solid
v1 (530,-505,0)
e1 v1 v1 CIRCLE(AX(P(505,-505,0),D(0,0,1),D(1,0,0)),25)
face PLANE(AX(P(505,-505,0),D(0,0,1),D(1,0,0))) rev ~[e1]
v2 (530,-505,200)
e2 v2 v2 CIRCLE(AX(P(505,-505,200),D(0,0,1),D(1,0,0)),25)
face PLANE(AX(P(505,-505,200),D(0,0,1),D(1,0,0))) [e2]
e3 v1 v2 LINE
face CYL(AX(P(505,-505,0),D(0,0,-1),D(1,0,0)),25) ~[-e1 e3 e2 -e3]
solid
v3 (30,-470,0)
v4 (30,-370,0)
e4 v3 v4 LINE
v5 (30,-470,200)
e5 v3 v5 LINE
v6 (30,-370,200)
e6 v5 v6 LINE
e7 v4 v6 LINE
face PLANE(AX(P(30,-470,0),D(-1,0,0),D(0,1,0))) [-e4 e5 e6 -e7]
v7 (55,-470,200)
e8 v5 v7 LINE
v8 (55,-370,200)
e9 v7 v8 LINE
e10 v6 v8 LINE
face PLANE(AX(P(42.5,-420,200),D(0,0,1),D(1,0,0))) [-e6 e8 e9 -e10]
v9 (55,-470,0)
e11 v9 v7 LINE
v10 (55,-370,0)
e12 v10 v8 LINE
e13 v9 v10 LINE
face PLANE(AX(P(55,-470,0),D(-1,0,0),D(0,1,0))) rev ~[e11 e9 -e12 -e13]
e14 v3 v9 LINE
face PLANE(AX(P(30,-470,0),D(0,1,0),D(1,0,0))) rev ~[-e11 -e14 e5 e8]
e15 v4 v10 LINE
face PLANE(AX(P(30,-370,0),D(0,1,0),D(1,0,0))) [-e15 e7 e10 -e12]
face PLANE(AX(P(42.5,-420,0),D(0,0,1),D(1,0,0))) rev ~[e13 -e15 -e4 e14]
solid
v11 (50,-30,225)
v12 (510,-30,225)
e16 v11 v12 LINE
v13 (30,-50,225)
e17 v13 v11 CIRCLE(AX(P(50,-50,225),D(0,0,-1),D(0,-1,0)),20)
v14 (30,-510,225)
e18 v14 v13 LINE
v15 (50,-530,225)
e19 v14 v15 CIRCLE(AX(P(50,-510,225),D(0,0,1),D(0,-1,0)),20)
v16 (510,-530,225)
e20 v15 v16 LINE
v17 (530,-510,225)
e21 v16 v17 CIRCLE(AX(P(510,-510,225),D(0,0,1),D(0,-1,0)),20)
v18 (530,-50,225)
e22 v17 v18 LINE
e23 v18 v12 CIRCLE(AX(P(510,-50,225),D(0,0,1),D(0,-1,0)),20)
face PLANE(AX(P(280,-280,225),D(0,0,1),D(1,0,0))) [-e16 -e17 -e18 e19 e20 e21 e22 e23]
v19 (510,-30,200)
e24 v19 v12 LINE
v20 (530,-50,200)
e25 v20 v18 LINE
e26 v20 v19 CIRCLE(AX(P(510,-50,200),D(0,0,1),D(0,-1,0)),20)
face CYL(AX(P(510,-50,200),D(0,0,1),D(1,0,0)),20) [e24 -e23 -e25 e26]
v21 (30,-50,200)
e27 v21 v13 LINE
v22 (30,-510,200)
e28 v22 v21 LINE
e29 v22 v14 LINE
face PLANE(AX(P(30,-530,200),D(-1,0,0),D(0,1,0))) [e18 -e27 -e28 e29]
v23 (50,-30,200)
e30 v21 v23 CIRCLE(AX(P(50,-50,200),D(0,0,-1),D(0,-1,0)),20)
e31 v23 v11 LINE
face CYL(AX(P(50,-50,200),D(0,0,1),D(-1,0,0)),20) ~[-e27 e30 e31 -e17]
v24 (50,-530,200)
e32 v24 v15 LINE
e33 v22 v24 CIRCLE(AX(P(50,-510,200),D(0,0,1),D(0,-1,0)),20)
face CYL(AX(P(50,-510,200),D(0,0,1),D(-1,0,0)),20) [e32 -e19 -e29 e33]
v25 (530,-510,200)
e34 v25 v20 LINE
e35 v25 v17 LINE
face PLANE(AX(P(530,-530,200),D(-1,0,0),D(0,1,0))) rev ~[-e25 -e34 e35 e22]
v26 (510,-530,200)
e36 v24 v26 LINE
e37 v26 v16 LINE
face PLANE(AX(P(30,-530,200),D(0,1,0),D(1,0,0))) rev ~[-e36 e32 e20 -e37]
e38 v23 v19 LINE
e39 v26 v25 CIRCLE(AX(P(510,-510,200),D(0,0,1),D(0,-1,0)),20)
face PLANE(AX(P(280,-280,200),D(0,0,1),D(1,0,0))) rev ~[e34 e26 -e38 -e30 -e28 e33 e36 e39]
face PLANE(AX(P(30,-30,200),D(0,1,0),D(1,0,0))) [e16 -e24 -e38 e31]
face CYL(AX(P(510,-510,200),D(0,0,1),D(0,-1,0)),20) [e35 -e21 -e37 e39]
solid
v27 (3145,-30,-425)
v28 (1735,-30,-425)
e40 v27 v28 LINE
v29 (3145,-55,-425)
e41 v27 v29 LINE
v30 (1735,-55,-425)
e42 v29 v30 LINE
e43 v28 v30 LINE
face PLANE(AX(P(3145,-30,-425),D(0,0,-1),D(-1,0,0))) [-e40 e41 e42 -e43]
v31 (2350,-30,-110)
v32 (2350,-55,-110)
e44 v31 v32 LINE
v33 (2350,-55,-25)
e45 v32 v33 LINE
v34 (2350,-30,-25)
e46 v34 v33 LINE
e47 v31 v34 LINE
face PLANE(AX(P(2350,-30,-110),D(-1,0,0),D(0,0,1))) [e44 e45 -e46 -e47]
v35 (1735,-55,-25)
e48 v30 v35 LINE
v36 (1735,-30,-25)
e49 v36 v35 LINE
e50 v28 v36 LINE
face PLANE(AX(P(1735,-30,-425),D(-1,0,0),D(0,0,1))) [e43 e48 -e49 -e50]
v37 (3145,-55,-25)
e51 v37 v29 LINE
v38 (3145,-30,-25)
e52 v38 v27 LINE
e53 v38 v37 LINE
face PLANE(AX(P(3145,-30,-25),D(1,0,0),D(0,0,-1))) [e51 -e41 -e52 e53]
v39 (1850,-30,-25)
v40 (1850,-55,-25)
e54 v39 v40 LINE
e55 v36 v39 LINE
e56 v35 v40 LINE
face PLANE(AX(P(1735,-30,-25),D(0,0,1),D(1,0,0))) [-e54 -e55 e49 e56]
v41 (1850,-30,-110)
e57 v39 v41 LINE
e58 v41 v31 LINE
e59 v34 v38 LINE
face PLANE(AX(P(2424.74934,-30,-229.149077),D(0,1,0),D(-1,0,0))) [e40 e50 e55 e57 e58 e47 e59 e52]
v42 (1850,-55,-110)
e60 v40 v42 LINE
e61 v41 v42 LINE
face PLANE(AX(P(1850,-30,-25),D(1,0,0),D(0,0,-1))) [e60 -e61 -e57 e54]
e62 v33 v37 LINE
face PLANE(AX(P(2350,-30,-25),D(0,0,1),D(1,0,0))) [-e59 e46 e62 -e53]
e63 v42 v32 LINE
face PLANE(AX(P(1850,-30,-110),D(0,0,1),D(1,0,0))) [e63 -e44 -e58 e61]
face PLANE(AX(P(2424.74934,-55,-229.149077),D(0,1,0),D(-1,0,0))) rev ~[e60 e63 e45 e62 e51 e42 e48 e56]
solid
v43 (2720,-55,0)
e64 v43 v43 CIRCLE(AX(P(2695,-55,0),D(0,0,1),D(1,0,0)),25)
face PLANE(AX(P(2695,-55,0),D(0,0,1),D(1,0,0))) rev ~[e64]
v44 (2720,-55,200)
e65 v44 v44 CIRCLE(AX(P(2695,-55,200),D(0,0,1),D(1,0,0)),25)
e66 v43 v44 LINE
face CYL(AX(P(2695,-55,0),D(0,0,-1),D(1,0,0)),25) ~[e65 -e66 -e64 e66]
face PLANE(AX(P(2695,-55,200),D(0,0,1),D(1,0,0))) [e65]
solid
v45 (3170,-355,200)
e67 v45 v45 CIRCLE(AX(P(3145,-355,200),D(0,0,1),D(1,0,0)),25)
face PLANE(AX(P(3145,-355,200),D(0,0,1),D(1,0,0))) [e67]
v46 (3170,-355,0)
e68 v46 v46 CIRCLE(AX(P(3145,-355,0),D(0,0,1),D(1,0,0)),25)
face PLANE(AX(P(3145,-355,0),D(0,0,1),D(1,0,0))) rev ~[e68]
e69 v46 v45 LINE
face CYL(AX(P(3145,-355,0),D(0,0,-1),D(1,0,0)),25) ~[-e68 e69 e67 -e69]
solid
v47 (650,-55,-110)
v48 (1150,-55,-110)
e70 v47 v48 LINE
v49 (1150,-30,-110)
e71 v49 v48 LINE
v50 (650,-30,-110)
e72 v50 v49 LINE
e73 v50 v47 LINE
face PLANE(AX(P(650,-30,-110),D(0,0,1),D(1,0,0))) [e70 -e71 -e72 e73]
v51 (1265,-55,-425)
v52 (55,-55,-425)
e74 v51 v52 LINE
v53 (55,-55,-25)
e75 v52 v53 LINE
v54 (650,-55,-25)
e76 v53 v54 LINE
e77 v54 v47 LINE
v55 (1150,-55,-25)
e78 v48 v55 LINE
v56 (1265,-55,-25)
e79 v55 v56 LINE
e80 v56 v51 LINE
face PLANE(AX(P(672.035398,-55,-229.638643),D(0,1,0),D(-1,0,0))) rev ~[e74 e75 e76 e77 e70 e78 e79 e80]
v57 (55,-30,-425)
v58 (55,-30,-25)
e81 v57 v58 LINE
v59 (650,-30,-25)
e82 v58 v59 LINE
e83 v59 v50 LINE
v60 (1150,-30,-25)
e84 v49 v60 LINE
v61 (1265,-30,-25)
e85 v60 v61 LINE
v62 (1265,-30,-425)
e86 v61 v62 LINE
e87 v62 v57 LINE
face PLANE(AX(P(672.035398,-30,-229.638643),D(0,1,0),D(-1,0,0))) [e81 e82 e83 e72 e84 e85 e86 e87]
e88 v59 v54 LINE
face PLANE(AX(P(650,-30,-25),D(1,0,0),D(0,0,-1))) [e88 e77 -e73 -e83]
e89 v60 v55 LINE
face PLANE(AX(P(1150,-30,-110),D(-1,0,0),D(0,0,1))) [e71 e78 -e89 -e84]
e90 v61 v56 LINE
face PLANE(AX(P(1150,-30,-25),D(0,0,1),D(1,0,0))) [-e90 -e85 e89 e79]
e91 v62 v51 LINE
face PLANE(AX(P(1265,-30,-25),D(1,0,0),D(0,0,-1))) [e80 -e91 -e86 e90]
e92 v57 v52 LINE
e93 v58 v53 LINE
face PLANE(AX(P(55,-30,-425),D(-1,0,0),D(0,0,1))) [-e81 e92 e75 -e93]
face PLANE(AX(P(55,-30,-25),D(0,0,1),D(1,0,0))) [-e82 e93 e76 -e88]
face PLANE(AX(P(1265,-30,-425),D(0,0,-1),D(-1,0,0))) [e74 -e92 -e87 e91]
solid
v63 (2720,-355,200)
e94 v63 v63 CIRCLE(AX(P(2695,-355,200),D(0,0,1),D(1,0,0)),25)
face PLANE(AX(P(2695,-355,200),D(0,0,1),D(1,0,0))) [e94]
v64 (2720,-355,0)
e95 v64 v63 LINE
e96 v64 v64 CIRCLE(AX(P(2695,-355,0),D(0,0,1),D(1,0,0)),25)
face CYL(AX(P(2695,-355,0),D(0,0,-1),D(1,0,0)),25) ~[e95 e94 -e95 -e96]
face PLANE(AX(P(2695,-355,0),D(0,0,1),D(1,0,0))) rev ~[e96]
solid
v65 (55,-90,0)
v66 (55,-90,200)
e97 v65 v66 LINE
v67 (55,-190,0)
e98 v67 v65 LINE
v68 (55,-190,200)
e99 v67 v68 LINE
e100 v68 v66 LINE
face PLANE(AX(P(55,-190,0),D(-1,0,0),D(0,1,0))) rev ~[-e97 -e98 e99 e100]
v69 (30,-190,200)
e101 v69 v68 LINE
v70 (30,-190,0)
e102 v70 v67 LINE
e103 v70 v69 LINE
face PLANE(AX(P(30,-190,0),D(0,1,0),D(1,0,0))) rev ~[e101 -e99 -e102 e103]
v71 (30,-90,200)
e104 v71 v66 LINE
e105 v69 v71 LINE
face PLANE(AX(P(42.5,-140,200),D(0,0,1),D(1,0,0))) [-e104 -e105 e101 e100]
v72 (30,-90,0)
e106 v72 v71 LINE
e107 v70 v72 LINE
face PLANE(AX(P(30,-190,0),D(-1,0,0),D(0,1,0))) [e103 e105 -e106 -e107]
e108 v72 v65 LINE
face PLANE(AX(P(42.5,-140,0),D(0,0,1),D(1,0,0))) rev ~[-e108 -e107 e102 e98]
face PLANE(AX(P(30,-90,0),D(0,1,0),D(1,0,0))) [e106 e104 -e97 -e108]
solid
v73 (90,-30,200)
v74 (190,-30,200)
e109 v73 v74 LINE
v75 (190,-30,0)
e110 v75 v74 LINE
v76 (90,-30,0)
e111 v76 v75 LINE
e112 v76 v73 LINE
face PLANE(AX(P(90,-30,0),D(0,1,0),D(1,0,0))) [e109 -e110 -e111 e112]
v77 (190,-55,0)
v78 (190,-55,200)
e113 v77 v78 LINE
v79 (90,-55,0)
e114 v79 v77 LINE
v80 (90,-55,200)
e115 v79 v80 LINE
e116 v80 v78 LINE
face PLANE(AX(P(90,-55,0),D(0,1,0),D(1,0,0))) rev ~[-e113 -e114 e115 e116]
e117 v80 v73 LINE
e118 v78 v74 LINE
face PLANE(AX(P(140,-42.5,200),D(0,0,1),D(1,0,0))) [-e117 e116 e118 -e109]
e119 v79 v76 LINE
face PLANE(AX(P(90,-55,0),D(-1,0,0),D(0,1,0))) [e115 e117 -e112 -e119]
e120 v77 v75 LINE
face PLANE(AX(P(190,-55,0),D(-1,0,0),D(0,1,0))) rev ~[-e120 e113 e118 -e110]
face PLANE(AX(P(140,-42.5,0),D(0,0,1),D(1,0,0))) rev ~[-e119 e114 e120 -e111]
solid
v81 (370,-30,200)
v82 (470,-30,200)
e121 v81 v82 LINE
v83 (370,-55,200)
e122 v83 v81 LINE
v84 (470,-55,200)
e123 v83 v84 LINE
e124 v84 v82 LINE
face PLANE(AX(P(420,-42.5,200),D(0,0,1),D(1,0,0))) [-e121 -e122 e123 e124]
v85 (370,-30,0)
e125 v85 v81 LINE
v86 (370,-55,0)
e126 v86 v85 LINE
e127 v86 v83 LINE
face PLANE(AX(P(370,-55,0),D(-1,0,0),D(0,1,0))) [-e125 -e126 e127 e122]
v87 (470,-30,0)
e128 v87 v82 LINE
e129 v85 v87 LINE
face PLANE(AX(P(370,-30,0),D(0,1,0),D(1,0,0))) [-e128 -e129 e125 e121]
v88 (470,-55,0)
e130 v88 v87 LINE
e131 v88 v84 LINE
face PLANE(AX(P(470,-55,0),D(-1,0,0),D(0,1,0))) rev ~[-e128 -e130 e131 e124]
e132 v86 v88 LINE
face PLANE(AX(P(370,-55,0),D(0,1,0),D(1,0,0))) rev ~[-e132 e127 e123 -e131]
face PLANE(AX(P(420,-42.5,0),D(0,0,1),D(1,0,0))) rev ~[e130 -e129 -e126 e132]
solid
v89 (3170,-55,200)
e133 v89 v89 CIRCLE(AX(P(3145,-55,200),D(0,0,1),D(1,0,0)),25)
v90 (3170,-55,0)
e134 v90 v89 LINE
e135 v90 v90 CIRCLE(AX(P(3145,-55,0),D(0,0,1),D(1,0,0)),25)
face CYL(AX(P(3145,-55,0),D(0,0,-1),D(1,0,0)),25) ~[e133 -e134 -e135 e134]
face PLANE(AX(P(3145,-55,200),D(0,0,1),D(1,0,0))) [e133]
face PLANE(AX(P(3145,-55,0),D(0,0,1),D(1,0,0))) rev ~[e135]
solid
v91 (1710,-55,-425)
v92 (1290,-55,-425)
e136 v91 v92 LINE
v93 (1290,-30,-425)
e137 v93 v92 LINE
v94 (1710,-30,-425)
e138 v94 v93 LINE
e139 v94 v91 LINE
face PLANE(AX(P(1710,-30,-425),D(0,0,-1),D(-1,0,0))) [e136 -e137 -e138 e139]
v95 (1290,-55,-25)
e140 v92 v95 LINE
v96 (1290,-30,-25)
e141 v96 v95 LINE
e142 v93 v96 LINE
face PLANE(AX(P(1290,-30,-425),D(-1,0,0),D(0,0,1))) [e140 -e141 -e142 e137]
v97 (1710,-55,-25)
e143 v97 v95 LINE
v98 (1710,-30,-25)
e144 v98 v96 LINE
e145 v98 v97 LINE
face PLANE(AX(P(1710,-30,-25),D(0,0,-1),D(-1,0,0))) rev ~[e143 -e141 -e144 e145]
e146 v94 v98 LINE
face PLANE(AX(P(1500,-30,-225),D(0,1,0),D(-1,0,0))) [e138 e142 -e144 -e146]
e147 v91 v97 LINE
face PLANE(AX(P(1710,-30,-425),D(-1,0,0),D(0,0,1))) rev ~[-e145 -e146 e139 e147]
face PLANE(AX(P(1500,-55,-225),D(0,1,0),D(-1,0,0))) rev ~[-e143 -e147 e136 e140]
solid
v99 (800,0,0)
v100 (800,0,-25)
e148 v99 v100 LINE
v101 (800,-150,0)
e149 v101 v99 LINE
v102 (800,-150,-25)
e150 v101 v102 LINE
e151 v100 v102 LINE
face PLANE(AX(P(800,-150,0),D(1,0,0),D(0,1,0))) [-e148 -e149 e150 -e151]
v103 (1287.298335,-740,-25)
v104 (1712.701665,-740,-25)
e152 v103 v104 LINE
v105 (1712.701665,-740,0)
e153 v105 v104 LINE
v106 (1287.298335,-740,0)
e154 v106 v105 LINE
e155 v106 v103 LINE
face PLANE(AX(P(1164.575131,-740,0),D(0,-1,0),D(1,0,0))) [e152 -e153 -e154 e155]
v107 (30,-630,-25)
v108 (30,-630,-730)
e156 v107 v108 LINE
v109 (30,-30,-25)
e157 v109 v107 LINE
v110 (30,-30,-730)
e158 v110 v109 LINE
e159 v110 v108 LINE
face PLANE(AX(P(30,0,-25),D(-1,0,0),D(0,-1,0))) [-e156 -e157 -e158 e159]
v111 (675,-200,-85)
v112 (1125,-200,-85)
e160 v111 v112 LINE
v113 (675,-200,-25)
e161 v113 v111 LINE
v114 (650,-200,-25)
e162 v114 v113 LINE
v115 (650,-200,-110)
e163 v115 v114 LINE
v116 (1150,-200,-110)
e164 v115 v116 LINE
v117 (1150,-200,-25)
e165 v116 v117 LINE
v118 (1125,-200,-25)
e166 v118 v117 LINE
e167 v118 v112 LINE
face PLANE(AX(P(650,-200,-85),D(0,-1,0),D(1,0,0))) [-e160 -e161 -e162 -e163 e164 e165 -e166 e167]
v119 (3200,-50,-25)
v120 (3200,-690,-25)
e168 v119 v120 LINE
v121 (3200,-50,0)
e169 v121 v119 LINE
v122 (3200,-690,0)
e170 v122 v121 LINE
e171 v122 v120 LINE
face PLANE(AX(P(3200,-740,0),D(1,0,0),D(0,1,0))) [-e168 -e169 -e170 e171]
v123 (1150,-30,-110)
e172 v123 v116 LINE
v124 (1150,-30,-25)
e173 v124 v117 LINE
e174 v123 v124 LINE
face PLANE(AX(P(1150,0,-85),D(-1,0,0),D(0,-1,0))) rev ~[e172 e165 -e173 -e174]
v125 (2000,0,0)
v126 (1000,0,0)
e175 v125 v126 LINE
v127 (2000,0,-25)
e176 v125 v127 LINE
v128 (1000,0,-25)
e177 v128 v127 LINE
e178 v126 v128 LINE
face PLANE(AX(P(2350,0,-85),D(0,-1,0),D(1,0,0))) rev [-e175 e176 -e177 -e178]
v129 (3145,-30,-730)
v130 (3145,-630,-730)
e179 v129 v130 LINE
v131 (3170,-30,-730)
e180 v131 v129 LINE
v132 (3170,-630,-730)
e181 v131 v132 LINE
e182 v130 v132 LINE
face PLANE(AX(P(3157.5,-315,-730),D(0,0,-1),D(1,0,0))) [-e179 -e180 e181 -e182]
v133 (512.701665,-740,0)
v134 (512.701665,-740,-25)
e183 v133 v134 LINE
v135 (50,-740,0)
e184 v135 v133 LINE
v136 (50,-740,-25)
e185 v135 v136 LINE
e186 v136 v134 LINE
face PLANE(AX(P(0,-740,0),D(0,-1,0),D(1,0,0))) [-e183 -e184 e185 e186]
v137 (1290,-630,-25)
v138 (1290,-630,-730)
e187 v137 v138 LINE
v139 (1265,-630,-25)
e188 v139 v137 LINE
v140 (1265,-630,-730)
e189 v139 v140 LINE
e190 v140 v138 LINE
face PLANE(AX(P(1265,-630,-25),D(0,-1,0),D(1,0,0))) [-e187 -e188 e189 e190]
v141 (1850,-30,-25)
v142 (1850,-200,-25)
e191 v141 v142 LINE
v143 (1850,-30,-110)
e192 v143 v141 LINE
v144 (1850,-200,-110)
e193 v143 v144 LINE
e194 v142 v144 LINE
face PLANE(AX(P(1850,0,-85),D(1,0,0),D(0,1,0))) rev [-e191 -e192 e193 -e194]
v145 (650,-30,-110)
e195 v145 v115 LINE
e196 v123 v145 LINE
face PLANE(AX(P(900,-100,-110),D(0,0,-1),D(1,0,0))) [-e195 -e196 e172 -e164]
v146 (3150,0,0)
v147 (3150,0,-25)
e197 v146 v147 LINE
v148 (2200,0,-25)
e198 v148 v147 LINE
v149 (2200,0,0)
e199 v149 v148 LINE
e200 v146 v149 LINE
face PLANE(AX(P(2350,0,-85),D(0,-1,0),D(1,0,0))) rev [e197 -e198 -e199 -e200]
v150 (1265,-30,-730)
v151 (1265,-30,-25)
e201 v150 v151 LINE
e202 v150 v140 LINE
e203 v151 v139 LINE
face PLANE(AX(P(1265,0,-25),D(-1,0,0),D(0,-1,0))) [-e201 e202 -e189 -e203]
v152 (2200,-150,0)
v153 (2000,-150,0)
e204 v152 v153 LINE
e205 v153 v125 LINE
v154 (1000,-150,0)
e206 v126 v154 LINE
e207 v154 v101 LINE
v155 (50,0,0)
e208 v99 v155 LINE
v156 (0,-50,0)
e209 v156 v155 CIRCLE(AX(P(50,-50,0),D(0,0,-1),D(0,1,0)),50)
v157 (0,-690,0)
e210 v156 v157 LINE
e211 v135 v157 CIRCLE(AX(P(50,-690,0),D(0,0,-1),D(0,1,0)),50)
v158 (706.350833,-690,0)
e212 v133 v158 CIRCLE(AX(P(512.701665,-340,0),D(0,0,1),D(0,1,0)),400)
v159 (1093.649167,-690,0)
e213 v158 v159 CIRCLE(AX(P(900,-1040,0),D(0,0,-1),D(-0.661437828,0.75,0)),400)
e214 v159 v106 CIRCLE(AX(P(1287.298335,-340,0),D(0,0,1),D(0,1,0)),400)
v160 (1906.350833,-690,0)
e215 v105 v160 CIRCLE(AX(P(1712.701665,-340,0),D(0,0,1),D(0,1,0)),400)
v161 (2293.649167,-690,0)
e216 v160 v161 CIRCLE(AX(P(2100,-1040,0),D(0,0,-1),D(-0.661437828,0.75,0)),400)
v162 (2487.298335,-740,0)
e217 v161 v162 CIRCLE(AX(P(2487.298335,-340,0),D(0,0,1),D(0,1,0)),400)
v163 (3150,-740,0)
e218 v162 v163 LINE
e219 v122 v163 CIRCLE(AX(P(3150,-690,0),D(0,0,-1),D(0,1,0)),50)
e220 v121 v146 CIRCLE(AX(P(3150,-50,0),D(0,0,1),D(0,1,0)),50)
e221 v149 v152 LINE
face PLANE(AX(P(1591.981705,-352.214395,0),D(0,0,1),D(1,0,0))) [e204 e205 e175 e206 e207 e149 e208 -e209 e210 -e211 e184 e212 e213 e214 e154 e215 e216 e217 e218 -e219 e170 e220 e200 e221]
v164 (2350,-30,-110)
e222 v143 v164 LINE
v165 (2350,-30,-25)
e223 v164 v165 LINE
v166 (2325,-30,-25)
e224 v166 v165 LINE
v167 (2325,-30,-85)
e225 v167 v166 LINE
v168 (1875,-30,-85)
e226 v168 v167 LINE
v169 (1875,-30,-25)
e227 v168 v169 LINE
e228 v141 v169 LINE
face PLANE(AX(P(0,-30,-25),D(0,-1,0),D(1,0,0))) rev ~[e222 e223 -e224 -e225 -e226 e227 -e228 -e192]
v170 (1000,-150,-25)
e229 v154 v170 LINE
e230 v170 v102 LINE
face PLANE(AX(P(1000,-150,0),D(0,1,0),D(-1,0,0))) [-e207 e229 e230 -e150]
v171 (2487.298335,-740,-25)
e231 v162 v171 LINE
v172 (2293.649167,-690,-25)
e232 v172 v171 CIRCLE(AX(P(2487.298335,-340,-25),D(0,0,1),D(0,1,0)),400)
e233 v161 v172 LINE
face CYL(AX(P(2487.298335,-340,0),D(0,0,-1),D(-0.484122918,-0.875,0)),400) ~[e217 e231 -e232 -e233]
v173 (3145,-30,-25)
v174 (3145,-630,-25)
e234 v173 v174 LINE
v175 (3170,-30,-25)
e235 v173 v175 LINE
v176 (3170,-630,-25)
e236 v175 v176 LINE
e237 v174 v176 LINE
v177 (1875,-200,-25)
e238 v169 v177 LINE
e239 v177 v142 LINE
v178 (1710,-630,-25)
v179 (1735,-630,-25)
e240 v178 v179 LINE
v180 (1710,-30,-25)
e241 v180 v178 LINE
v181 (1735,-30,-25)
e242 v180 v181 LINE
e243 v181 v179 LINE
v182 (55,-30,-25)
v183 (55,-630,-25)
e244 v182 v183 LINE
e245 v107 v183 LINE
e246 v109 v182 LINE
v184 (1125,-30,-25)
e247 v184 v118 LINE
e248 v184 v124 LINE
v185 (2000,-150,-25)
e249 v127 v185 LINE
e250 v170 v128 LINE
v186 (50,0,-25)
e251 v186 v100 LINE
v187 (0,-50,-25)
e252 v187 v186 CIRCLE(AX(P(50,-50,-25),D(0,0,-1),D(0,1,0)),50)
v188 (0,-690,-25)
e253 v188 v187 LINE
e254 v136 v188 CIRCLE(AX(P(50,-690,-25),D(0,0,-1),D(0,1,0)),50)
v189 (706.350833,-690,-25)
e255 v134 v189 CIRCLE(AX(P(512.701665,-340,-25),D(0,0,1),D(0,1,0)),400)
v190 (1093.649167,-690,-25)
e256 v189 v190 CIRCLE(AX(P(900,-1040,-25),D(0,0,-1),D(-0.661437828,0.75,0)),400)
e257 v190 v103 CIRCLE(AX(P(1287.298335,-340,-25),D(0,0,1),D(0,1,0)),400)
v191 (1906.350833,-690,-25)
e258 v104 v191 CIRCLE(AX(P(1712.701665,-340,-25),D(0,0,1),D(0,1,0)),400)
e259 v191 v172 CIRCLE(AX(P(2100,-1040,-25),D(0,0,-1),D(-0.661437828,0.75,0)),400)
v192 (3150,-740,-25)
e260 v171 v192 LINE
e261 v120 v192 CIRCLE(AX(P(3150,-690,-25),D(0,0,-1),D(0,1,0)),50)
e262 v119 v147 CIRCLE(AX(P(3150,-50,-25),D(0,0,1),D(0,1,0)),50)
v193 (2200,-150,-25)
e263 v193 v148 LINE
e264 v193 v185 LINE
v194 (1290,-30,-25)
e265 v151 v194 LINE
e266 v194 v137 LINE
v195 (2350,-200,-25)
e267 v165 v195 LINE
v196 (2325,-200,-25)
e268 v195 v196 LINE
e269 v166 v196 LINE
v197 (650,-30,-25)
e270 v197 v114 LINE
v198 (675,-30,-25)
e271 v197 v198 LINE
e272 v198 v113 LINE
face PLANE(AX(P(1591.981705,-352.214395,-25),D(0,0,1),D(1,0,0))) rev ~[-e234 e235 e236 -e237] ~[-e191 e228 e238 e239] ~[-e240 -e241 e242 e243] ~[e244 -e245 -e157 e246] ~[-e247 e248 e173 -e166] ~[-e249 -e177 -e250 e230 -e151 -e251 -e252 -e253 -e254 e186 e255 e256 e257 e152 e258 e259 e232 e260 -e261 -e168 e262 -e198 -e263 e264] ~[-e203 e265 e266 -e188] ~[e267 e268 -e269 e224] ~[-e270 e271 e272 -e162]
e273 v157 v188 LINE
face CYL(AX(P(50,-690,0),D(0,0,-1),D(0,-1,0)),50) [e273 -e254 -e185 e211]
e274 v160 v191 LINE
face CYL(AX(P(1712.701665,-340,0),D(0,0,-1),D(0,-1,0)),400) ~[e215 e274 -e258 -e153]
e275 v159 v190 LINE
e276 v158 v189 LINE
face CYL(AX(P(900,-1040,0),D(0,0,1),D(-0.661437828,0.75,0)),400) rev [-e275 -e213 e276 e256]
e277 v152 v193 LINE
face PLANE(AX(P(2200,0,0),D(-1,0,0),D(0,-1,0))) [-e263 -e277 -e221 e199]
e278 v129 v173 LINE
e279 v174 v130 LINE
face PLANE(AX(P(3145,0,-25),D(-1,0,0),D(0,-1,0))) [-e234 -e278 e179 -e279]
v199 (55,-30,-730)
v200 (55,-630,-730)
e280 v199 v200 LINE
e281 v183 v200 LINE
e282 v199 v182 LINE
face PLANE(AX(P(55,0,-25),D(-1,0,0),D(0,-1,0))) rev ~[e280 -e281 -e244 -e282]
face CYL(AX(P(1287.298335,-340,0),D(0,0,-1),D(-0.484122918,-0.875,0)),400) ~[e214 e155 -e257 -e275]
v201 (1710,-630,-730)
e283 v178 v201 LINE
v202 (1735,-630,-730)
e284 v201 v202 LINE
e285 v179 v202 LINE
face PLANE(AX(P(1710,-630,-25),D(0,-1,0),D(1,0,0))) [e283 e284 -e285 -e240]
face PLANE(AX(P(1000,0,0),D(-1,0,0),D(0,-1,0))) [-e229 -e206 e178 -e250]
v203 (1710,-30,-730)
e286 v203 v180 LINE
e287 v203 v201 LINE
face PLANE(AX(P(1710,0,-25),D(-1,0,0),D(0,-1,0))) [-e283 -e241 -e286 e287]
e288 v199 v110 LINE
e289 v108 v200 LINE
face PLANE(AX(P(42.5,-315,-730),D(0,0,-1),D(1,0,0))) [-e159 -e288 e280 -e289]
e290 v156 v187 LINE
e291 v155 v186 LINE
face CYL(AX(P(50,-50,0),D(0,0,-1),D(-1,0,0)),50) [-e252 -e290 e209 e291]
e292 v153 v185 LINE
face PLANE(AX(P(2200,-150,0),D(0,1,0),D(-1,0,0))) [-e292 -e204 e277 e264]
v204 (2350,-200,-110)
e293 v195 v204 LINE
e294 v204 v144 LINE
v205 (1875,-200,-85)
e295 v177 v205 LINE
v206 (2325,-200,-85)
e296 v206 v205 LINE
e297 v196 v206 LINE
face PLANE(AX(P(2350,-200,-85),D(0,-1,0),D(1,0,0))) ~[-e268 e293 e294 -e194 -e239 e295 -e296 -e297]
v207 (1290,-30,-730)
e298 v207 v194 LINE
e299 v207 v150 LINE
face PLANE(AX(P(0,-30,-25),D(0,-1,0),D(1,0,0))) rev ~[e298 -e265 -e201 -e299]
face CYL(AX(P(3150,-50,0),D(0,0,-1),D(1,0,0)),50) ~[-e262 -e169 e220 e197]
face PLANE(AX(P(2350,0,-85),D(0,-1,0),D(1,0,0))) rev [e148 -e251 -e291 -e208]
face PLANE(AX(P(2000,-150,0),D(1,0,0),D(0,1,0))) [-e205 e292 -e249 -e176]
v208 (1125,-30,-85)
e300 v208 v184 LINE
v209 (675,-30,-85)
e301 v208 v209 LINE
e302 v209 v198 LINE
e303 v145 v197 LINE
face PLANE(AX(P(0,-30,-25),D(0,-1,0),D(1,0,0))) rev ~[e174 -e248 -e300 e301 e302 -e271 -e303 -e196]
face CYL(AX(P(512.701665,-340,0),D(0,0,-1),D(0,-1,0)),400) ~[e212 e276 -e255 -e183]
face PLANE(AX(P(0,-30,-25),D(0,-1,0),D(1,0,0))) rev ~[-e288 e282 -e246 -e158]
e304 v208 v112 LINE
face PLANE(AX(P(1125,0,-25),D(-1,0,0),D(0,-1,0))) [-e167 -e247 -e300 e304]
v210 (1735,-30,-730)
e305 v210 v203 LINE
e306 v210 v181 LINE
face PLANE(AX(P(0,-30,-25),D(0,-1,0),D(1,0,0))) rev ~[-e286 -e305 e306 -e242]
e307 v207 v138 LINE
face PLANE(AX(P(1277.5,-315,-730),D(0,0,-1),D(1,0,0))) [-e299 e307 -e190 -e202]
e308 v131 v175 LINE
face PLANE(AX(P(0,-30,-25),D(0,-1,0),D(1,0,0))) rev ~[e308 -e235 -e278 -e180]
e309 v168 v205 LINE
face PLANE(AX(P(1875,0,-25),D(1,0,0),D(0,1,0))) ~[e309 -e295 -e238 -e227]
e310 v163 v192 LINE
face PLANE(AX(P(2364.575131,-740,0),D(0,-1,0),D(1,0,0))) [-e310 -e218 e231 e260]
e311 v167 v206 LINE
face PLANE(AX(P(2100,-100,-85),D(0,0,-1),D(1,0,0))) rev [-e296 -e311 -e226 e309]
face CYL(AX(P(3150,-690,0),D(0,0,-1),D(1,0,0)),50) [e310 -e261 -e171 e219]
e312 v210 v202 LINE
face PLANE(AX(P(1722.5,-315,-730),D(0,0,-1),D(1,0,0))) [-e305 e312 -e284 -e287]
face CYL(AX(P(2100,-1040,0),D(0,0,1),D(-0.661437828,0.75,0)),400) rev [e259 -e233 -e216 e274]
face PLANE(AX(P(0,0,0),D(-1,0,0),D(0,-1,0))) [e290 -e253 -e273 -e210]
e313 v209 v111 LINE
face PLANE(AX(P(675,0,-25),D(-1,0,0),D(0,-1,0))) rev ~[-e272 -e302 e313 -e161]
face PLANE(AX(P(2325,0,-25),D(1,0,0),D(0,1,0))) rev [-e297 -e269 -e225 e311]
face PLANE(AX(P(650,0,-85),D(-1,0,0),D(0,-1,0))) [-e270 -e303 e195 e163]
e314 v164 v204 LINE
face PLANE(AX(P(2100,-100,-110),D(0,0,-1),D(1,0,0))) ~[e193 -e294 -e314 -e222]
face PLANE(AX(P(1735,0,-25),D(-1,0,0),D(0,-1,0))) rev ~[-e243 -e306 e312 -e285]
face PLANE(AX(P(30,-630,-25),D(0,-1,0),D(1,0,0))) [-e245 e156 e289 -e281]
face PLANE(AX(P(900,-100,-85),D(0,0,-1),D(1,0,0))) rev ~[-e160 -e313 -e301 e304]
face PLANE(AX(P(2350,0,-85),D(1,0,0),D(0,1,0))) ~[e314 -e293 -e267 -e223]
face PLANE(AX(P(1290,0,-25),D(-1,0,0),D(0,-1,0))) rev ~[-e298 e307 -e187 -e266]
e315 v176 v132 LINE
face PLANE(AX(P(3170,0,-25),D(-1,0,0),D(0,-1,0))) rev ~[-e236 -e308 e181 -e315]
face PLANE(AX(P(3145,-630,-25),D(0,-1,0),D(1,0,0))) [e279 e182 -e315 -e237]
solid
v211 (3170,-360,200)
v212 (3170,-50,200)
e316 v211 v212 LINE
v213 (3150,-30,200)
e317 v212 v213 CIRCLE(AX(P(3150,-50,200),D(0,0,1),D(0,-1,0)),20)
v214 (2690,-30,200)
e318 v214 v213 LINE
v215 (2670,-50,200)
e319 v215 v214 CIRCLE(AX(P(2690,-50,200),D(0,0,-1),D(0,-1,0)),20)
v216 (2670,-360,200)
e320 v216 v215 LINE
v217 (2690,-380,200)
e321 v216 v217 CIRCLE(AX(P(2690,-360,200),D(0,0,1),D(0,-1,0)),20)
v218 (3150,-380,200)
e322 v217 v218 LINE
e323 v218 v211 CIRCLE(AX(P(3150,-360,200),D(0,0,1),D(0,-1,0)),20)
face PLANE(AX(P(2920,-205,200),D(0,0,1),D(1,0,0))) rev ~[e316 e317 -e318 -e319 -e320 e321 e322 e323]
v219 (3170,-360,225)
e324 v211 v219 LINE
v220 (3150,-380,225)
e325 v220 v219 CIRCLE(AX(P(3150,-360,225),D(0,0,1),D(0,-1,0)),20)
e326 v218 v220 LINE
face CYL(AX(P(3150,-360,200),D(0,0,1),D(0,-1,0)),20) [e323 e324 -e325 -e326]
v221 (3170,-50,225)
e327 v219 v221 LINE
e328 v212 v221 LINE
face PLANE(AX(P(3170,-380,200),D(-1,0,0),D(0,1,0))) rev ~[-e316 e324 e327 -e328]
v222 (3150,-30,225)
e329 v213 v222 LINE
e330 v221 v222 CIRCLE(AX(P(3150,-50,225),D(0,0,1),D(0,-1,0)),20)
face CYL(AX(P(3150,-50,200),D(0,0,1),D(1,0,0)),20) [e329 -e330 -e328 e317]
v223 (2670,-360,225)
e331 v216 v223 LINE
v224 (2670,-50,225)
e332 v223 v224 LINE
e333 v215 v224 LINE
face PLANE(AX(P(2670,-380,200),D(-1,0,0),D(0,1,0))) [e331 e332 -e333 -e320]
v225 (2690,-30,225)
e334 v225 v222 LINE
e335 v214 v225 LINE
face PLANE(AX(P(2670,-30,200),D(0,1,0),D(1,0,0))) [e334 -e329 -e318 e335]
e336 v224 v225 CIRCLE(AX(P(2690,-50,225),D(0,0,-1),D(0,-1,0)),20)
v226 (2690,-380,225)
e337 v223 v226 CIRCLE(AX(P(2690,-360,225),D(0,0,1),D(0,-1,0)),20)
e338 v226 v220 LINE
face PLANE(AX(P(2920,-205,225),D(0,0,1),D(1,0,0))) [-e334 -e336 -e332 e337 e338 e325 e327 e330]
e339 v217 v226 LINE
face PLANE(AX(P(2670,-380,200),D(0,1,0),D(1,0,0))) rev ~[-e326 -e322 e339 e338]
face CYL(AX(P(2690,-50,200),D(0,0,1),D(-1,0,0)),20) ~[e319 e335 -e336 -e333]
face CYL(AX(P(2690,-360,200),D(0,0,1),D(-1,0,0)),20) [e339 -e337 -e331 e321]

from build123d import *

# Parameters (mm, degrees)
F2_DEPTH  = 25
F3_R      = 400
F6_W      = 25
F6_H      = 630
F7_DEPTH  = 705
F8_W      = 25
F8_H      = 200
F9_DEPTH  = 60
F10_W     = 500
F10_H     = 200
F11_DEPTH = 25
F12_W     = 3200
F12_H     = 30
F13_DEPTH = 705.001
F14_R     = 50
F15_W     = 100
F15_H     = 25
F16_DEPTH = 200
F15_W_2   = 25
F15_H_2   = 100
F15_R     = 25
F17_W     = 500
F17_H     = 500
F18_DEPTH = 25
F19_R     = 20
F21_DEPTH = 25
F20_W     = 420
F20_H     = 400
F22_R     = 25
F23_DEPTH = 200
F24_W     = 500
F24_H     = 350
F25_DEPTH = 25
F26_R     = 20


# Not quite as in the source:
# - a pattern or mirror of a feature is missing from the dataset's text; its kind, count and spacing are read off the source's solid


with BuildPart() as f2:
    # F1 (on Top) → F2 (new body)
    with BuildSketch(Plane.XY):
        with BuildLine():
            Line((800, 0), (0, 0))
            Line((0, 0), (0, -740))
            Line((0, -740), (635.4248688935, -740))
            ThreePointArc((635.4248688935, -740), (900, -640), (1164.5751311065, -740))
            Line((1164.5751311065, -740), (1835.4248688935, -740))
            ThreePointArc((1835.4248688935, -740), (2100, -640), (2364.5751311065, -740))
            Line((2364.5751311065, -740), (3200, -740))
            Line((3200, -740), (3200, 0))
            Line((3200, 0), (2200, 0))
            Line((2200, 0), (2200, -150))
            Line((2200, -150), (2000, -150))
            Line((2000, -150), (2000, 0))
            Line((2000, 0), (1000, 0))
            Line((1000, 0), (1000, -150))
            Line((1000, -150), (800, -150))
            Line((800, -150), (800, 0))
        make_face()
    extrude(amount=-F2_DEPTH)

    # F3
    f3_edges = [f2.edges().sort_by_distance(p)[0] for p in [
        (635.424869, -740, -12.5),
        (1164.575131, -740, -12.5),
        (1835.424869, -740, -12.5),
        (2364.575131, -740, -12.5),
    ]]
    fillet(f3_edges, radius=F3_R)

    # F6 (on face) → F7 (join)
    with BuildSketch(Plane(origin=(0, 0, -25), x_dir=(1, 0, 0), z_dir=(0, 0, -1))):
        with Locations((1277.5, 315)):
            Rectangle(F6_W, F6_H)
        with Locations((1722.5, 315)):
            Rectangle(F6_W, F6_H)
        with Locations((42.5, 315)):
            Rectangle(F6_W, F6_H)
        with Locations((3157.5, 315)):
            Rectangle(F6_W, F6_H)
    extrude(amount=F7_DEPTH)

    # F8 (on face) → F9 (join)
    with BuildSketch(Plane(origin=(0, 0, -25), x_dir=(1, 0, 0), z_dir=(0, 0, -1))):
        with Locations((662.5, 100)):
            Rectangle(F8_W, F8_H)
        with Locations((1137.5, 100)):
            Rectangle(F8_W, F8_H)
    f9 = extrude(amount=F9_DEPTH)

    # F9_copies: F9 across plane
    add(f9.mirror(Plane(origin=(1500, 0, 0), x_dir=(0, 0, 1), z_dir=(1, 0, 0))))

    # F10 (on face) → F11 (join)
    with BuildSketch(Plane(origin=(0, 0, -85), x_dir=(1, 0, 0), z_dir=(0, 0, -1))):
        with Locations((900, 100)):
            Rectangle(F10_W, F10_H)
    f11 = extrude(amount=F11_DEPTH)

    # F11_copies: F11 across plane
    add(f11.mirror(Plane(origin=(1500, 0, 0), x_dir=(0, 0, 1), z_dir=(1, 0, 0))))

    # F12 (on face) → F13 (cut, through all)
    with BuildSketch(Plane(origin=(0, 0, -25), x_dir=(1, 0, 0), z_dir=(0, 0, -1))):
        with Locations((1600, 15)):
            Rectangle(F12_W, F12_H)
    extrude(amount=F13_DEPTH, mode=Mode.SUBTRACT)

    # F14
    f14_edges = [f2.edges().sort_by_distance(p)[0] for p in [
        (3200, -740, -12.5),
        (3200, 0, -12.5),
        (0, 0, -12.5),
        (0, -740, -12.5),
    ]]
    fillet(f14_edges, radius=F14_R)


with BuildPart() as f16:
    # F15 (on face) → F16 (new body)
    with BuildSketch(Plane.XY):
        with Locations((140, -42.5)):
            Rectangle(F15_W, F15_H)
    extrude(amount=F16_DEPTH)


with BuildPart() as f16b:
    # F15 (on face) → F16, piece 2 (new body)
    with BuildSketch(Plane.XY):
        with Locations((42.5, -140)):
            Rectangle(F15_W_2, F15_H_2)
    extrude(amount=F16_DEPTH)


with BuildPart() as f16c:
    # F15 (on face) → F16, piece 3 (new body)
    with BuildSketch(Plane.XY):
        with Locations((420, -42.5)):
            Rectangle(F15_W, F15_H)
    extrude(amount=F16_DEPTH)


with BuildPart() as f16d:
    # F15 (on face) → F16, piece 4 (new body)
    with BuildSketch(Plane.XY):
        with Locations((42.5, -420)):
            Rectangle(F15_W_2, F15_H_2)
    extrude(amount=F16_DEPTH)


with BuildPart() as f16e:
    # F15 (on face) → F16, piece 5 (new body)
    with BuildSketch(Plane.XY):
        with Locations((505, -505)):
            Circle(F15_R)
    extrude(amount=F16_DEPTH)


with BuildPart() as f18:
    # F17 (on face) → F18 (new body)
    with BuildSketch(Plane.XY.offset(200)):
        with Locations((280, -280)):
            Rectangle(F17_W, F17_H)
    extrude(amount=F18_DEPTH)

    # F19
    f19_edges = [f18.edges().sort_by_distance(p)[0] for p in [
        (530, -530, 212.5),
        (530, -30, 212.5),
        (30, -530, 212.5),
        (30, -30, 212.5),
    ]]
    fillet(f19_edges, radius=F19_R)


with BuildPart() as f21:
    # F20 (on face) → F21 (new body)
    with BuildSketch(Plane(origin=(0, -30, 0), x_dir=(-1, 0, 0), z_dir=(0, 1, 0))):
        Polygon((-1265, -425), (-55, -425), (-55, -25), (-650, -25), (-650, -110), (-1150, -110), (-1150, -25), (-1265, -25), align=None)
    extrude(amount=-F21_DEPTH)


with BuildPart() as f21b:
    # F20 (on face) → F21, piece 2 (new body)
    with BuildSketch(Plane(origin=(0, -30, 0), x_dir=(-1, 0, 0), z_dir=(0, 1, 0))):
        with Locations((-1500, -225)):
            Rectangle(F20_W, F20_H)
    extrude(amount=-F21_DEPTH)


with BuildPart() as f21c:
    # F20 (on face) → F21, piece 3 (new body)
    with BuildSketch(Plane(origin=(0, -30, 0), x_dir=(-1, 0, 0), z_dir=(0, 1, 0))):
        Polygon((-2350, -25), (-3145, -25), (-3145, -425), (-1735, -425), (-1735, -25), (-1850, -25), (-1850, -110), (-2350, -110), align=None)
    extrude(amount=-F21_DEPTH)


with BuildPart() as f23:
    # F22 (on face) → F23 (new body)
    with BuildSketch(Plane.XY):
        with Locations((2695, -55)):
            Circle(F22_R)
    extrude(amount=F23_DEPTH)


with BuildPart() as f23b:
    # F22 (on face) → F23, piece 2 (new body)
    with BuildSketch(Plane.XY):
        with Locations((3145, -55)):
            Circle(F22_R)
    extrude(amount=F23_DEPTH)


with BuildPart() as f23c:
    # F22 (on face) → F23, piece 3 (new body)
    with BuildSketch(Plane.XY):
        with Locations((3145, -355)):
            Circle(F22_R)
    extrude(amount=F23_DEPTH)


with BuildPart() as f23d:
    # F22 (on face) → F23, piece 4 (new body)
    with BuildSketch(Plane.XY):
        with Locations((2695, -355)):
            Circle(F22_R)
    extrude(amount=F23_DEPTH)


with BuildPart() as f25:
    # F24 (on face) → F25 (new body)
    with BuildSketch(Plane.XY.offset(200)):
        with Locations((2920, -205)):
            Rectangle(F24_W, F24_H)
    extrude(amount=F25_DEPTH)

    # F26
    f26_edges = [f25.edges().sort_by_distance(p)[0] for p in [
        (2670, -380, 212.5),
        (3170, -380, 212.5),
        (2670, -30, 212.5),
        (3170, -30, 212.5),
    ]]
    fillet(f26_edges, radius=F26_R)


solid = Compound([f2.part, f16.part, f16b.part, f16c.part, f16d.part, f16e.part, f18.part, f21.part, f21b.part, f21c.part, f23.part, f23b.part, f23c.part, f23d.part, f25.part])
